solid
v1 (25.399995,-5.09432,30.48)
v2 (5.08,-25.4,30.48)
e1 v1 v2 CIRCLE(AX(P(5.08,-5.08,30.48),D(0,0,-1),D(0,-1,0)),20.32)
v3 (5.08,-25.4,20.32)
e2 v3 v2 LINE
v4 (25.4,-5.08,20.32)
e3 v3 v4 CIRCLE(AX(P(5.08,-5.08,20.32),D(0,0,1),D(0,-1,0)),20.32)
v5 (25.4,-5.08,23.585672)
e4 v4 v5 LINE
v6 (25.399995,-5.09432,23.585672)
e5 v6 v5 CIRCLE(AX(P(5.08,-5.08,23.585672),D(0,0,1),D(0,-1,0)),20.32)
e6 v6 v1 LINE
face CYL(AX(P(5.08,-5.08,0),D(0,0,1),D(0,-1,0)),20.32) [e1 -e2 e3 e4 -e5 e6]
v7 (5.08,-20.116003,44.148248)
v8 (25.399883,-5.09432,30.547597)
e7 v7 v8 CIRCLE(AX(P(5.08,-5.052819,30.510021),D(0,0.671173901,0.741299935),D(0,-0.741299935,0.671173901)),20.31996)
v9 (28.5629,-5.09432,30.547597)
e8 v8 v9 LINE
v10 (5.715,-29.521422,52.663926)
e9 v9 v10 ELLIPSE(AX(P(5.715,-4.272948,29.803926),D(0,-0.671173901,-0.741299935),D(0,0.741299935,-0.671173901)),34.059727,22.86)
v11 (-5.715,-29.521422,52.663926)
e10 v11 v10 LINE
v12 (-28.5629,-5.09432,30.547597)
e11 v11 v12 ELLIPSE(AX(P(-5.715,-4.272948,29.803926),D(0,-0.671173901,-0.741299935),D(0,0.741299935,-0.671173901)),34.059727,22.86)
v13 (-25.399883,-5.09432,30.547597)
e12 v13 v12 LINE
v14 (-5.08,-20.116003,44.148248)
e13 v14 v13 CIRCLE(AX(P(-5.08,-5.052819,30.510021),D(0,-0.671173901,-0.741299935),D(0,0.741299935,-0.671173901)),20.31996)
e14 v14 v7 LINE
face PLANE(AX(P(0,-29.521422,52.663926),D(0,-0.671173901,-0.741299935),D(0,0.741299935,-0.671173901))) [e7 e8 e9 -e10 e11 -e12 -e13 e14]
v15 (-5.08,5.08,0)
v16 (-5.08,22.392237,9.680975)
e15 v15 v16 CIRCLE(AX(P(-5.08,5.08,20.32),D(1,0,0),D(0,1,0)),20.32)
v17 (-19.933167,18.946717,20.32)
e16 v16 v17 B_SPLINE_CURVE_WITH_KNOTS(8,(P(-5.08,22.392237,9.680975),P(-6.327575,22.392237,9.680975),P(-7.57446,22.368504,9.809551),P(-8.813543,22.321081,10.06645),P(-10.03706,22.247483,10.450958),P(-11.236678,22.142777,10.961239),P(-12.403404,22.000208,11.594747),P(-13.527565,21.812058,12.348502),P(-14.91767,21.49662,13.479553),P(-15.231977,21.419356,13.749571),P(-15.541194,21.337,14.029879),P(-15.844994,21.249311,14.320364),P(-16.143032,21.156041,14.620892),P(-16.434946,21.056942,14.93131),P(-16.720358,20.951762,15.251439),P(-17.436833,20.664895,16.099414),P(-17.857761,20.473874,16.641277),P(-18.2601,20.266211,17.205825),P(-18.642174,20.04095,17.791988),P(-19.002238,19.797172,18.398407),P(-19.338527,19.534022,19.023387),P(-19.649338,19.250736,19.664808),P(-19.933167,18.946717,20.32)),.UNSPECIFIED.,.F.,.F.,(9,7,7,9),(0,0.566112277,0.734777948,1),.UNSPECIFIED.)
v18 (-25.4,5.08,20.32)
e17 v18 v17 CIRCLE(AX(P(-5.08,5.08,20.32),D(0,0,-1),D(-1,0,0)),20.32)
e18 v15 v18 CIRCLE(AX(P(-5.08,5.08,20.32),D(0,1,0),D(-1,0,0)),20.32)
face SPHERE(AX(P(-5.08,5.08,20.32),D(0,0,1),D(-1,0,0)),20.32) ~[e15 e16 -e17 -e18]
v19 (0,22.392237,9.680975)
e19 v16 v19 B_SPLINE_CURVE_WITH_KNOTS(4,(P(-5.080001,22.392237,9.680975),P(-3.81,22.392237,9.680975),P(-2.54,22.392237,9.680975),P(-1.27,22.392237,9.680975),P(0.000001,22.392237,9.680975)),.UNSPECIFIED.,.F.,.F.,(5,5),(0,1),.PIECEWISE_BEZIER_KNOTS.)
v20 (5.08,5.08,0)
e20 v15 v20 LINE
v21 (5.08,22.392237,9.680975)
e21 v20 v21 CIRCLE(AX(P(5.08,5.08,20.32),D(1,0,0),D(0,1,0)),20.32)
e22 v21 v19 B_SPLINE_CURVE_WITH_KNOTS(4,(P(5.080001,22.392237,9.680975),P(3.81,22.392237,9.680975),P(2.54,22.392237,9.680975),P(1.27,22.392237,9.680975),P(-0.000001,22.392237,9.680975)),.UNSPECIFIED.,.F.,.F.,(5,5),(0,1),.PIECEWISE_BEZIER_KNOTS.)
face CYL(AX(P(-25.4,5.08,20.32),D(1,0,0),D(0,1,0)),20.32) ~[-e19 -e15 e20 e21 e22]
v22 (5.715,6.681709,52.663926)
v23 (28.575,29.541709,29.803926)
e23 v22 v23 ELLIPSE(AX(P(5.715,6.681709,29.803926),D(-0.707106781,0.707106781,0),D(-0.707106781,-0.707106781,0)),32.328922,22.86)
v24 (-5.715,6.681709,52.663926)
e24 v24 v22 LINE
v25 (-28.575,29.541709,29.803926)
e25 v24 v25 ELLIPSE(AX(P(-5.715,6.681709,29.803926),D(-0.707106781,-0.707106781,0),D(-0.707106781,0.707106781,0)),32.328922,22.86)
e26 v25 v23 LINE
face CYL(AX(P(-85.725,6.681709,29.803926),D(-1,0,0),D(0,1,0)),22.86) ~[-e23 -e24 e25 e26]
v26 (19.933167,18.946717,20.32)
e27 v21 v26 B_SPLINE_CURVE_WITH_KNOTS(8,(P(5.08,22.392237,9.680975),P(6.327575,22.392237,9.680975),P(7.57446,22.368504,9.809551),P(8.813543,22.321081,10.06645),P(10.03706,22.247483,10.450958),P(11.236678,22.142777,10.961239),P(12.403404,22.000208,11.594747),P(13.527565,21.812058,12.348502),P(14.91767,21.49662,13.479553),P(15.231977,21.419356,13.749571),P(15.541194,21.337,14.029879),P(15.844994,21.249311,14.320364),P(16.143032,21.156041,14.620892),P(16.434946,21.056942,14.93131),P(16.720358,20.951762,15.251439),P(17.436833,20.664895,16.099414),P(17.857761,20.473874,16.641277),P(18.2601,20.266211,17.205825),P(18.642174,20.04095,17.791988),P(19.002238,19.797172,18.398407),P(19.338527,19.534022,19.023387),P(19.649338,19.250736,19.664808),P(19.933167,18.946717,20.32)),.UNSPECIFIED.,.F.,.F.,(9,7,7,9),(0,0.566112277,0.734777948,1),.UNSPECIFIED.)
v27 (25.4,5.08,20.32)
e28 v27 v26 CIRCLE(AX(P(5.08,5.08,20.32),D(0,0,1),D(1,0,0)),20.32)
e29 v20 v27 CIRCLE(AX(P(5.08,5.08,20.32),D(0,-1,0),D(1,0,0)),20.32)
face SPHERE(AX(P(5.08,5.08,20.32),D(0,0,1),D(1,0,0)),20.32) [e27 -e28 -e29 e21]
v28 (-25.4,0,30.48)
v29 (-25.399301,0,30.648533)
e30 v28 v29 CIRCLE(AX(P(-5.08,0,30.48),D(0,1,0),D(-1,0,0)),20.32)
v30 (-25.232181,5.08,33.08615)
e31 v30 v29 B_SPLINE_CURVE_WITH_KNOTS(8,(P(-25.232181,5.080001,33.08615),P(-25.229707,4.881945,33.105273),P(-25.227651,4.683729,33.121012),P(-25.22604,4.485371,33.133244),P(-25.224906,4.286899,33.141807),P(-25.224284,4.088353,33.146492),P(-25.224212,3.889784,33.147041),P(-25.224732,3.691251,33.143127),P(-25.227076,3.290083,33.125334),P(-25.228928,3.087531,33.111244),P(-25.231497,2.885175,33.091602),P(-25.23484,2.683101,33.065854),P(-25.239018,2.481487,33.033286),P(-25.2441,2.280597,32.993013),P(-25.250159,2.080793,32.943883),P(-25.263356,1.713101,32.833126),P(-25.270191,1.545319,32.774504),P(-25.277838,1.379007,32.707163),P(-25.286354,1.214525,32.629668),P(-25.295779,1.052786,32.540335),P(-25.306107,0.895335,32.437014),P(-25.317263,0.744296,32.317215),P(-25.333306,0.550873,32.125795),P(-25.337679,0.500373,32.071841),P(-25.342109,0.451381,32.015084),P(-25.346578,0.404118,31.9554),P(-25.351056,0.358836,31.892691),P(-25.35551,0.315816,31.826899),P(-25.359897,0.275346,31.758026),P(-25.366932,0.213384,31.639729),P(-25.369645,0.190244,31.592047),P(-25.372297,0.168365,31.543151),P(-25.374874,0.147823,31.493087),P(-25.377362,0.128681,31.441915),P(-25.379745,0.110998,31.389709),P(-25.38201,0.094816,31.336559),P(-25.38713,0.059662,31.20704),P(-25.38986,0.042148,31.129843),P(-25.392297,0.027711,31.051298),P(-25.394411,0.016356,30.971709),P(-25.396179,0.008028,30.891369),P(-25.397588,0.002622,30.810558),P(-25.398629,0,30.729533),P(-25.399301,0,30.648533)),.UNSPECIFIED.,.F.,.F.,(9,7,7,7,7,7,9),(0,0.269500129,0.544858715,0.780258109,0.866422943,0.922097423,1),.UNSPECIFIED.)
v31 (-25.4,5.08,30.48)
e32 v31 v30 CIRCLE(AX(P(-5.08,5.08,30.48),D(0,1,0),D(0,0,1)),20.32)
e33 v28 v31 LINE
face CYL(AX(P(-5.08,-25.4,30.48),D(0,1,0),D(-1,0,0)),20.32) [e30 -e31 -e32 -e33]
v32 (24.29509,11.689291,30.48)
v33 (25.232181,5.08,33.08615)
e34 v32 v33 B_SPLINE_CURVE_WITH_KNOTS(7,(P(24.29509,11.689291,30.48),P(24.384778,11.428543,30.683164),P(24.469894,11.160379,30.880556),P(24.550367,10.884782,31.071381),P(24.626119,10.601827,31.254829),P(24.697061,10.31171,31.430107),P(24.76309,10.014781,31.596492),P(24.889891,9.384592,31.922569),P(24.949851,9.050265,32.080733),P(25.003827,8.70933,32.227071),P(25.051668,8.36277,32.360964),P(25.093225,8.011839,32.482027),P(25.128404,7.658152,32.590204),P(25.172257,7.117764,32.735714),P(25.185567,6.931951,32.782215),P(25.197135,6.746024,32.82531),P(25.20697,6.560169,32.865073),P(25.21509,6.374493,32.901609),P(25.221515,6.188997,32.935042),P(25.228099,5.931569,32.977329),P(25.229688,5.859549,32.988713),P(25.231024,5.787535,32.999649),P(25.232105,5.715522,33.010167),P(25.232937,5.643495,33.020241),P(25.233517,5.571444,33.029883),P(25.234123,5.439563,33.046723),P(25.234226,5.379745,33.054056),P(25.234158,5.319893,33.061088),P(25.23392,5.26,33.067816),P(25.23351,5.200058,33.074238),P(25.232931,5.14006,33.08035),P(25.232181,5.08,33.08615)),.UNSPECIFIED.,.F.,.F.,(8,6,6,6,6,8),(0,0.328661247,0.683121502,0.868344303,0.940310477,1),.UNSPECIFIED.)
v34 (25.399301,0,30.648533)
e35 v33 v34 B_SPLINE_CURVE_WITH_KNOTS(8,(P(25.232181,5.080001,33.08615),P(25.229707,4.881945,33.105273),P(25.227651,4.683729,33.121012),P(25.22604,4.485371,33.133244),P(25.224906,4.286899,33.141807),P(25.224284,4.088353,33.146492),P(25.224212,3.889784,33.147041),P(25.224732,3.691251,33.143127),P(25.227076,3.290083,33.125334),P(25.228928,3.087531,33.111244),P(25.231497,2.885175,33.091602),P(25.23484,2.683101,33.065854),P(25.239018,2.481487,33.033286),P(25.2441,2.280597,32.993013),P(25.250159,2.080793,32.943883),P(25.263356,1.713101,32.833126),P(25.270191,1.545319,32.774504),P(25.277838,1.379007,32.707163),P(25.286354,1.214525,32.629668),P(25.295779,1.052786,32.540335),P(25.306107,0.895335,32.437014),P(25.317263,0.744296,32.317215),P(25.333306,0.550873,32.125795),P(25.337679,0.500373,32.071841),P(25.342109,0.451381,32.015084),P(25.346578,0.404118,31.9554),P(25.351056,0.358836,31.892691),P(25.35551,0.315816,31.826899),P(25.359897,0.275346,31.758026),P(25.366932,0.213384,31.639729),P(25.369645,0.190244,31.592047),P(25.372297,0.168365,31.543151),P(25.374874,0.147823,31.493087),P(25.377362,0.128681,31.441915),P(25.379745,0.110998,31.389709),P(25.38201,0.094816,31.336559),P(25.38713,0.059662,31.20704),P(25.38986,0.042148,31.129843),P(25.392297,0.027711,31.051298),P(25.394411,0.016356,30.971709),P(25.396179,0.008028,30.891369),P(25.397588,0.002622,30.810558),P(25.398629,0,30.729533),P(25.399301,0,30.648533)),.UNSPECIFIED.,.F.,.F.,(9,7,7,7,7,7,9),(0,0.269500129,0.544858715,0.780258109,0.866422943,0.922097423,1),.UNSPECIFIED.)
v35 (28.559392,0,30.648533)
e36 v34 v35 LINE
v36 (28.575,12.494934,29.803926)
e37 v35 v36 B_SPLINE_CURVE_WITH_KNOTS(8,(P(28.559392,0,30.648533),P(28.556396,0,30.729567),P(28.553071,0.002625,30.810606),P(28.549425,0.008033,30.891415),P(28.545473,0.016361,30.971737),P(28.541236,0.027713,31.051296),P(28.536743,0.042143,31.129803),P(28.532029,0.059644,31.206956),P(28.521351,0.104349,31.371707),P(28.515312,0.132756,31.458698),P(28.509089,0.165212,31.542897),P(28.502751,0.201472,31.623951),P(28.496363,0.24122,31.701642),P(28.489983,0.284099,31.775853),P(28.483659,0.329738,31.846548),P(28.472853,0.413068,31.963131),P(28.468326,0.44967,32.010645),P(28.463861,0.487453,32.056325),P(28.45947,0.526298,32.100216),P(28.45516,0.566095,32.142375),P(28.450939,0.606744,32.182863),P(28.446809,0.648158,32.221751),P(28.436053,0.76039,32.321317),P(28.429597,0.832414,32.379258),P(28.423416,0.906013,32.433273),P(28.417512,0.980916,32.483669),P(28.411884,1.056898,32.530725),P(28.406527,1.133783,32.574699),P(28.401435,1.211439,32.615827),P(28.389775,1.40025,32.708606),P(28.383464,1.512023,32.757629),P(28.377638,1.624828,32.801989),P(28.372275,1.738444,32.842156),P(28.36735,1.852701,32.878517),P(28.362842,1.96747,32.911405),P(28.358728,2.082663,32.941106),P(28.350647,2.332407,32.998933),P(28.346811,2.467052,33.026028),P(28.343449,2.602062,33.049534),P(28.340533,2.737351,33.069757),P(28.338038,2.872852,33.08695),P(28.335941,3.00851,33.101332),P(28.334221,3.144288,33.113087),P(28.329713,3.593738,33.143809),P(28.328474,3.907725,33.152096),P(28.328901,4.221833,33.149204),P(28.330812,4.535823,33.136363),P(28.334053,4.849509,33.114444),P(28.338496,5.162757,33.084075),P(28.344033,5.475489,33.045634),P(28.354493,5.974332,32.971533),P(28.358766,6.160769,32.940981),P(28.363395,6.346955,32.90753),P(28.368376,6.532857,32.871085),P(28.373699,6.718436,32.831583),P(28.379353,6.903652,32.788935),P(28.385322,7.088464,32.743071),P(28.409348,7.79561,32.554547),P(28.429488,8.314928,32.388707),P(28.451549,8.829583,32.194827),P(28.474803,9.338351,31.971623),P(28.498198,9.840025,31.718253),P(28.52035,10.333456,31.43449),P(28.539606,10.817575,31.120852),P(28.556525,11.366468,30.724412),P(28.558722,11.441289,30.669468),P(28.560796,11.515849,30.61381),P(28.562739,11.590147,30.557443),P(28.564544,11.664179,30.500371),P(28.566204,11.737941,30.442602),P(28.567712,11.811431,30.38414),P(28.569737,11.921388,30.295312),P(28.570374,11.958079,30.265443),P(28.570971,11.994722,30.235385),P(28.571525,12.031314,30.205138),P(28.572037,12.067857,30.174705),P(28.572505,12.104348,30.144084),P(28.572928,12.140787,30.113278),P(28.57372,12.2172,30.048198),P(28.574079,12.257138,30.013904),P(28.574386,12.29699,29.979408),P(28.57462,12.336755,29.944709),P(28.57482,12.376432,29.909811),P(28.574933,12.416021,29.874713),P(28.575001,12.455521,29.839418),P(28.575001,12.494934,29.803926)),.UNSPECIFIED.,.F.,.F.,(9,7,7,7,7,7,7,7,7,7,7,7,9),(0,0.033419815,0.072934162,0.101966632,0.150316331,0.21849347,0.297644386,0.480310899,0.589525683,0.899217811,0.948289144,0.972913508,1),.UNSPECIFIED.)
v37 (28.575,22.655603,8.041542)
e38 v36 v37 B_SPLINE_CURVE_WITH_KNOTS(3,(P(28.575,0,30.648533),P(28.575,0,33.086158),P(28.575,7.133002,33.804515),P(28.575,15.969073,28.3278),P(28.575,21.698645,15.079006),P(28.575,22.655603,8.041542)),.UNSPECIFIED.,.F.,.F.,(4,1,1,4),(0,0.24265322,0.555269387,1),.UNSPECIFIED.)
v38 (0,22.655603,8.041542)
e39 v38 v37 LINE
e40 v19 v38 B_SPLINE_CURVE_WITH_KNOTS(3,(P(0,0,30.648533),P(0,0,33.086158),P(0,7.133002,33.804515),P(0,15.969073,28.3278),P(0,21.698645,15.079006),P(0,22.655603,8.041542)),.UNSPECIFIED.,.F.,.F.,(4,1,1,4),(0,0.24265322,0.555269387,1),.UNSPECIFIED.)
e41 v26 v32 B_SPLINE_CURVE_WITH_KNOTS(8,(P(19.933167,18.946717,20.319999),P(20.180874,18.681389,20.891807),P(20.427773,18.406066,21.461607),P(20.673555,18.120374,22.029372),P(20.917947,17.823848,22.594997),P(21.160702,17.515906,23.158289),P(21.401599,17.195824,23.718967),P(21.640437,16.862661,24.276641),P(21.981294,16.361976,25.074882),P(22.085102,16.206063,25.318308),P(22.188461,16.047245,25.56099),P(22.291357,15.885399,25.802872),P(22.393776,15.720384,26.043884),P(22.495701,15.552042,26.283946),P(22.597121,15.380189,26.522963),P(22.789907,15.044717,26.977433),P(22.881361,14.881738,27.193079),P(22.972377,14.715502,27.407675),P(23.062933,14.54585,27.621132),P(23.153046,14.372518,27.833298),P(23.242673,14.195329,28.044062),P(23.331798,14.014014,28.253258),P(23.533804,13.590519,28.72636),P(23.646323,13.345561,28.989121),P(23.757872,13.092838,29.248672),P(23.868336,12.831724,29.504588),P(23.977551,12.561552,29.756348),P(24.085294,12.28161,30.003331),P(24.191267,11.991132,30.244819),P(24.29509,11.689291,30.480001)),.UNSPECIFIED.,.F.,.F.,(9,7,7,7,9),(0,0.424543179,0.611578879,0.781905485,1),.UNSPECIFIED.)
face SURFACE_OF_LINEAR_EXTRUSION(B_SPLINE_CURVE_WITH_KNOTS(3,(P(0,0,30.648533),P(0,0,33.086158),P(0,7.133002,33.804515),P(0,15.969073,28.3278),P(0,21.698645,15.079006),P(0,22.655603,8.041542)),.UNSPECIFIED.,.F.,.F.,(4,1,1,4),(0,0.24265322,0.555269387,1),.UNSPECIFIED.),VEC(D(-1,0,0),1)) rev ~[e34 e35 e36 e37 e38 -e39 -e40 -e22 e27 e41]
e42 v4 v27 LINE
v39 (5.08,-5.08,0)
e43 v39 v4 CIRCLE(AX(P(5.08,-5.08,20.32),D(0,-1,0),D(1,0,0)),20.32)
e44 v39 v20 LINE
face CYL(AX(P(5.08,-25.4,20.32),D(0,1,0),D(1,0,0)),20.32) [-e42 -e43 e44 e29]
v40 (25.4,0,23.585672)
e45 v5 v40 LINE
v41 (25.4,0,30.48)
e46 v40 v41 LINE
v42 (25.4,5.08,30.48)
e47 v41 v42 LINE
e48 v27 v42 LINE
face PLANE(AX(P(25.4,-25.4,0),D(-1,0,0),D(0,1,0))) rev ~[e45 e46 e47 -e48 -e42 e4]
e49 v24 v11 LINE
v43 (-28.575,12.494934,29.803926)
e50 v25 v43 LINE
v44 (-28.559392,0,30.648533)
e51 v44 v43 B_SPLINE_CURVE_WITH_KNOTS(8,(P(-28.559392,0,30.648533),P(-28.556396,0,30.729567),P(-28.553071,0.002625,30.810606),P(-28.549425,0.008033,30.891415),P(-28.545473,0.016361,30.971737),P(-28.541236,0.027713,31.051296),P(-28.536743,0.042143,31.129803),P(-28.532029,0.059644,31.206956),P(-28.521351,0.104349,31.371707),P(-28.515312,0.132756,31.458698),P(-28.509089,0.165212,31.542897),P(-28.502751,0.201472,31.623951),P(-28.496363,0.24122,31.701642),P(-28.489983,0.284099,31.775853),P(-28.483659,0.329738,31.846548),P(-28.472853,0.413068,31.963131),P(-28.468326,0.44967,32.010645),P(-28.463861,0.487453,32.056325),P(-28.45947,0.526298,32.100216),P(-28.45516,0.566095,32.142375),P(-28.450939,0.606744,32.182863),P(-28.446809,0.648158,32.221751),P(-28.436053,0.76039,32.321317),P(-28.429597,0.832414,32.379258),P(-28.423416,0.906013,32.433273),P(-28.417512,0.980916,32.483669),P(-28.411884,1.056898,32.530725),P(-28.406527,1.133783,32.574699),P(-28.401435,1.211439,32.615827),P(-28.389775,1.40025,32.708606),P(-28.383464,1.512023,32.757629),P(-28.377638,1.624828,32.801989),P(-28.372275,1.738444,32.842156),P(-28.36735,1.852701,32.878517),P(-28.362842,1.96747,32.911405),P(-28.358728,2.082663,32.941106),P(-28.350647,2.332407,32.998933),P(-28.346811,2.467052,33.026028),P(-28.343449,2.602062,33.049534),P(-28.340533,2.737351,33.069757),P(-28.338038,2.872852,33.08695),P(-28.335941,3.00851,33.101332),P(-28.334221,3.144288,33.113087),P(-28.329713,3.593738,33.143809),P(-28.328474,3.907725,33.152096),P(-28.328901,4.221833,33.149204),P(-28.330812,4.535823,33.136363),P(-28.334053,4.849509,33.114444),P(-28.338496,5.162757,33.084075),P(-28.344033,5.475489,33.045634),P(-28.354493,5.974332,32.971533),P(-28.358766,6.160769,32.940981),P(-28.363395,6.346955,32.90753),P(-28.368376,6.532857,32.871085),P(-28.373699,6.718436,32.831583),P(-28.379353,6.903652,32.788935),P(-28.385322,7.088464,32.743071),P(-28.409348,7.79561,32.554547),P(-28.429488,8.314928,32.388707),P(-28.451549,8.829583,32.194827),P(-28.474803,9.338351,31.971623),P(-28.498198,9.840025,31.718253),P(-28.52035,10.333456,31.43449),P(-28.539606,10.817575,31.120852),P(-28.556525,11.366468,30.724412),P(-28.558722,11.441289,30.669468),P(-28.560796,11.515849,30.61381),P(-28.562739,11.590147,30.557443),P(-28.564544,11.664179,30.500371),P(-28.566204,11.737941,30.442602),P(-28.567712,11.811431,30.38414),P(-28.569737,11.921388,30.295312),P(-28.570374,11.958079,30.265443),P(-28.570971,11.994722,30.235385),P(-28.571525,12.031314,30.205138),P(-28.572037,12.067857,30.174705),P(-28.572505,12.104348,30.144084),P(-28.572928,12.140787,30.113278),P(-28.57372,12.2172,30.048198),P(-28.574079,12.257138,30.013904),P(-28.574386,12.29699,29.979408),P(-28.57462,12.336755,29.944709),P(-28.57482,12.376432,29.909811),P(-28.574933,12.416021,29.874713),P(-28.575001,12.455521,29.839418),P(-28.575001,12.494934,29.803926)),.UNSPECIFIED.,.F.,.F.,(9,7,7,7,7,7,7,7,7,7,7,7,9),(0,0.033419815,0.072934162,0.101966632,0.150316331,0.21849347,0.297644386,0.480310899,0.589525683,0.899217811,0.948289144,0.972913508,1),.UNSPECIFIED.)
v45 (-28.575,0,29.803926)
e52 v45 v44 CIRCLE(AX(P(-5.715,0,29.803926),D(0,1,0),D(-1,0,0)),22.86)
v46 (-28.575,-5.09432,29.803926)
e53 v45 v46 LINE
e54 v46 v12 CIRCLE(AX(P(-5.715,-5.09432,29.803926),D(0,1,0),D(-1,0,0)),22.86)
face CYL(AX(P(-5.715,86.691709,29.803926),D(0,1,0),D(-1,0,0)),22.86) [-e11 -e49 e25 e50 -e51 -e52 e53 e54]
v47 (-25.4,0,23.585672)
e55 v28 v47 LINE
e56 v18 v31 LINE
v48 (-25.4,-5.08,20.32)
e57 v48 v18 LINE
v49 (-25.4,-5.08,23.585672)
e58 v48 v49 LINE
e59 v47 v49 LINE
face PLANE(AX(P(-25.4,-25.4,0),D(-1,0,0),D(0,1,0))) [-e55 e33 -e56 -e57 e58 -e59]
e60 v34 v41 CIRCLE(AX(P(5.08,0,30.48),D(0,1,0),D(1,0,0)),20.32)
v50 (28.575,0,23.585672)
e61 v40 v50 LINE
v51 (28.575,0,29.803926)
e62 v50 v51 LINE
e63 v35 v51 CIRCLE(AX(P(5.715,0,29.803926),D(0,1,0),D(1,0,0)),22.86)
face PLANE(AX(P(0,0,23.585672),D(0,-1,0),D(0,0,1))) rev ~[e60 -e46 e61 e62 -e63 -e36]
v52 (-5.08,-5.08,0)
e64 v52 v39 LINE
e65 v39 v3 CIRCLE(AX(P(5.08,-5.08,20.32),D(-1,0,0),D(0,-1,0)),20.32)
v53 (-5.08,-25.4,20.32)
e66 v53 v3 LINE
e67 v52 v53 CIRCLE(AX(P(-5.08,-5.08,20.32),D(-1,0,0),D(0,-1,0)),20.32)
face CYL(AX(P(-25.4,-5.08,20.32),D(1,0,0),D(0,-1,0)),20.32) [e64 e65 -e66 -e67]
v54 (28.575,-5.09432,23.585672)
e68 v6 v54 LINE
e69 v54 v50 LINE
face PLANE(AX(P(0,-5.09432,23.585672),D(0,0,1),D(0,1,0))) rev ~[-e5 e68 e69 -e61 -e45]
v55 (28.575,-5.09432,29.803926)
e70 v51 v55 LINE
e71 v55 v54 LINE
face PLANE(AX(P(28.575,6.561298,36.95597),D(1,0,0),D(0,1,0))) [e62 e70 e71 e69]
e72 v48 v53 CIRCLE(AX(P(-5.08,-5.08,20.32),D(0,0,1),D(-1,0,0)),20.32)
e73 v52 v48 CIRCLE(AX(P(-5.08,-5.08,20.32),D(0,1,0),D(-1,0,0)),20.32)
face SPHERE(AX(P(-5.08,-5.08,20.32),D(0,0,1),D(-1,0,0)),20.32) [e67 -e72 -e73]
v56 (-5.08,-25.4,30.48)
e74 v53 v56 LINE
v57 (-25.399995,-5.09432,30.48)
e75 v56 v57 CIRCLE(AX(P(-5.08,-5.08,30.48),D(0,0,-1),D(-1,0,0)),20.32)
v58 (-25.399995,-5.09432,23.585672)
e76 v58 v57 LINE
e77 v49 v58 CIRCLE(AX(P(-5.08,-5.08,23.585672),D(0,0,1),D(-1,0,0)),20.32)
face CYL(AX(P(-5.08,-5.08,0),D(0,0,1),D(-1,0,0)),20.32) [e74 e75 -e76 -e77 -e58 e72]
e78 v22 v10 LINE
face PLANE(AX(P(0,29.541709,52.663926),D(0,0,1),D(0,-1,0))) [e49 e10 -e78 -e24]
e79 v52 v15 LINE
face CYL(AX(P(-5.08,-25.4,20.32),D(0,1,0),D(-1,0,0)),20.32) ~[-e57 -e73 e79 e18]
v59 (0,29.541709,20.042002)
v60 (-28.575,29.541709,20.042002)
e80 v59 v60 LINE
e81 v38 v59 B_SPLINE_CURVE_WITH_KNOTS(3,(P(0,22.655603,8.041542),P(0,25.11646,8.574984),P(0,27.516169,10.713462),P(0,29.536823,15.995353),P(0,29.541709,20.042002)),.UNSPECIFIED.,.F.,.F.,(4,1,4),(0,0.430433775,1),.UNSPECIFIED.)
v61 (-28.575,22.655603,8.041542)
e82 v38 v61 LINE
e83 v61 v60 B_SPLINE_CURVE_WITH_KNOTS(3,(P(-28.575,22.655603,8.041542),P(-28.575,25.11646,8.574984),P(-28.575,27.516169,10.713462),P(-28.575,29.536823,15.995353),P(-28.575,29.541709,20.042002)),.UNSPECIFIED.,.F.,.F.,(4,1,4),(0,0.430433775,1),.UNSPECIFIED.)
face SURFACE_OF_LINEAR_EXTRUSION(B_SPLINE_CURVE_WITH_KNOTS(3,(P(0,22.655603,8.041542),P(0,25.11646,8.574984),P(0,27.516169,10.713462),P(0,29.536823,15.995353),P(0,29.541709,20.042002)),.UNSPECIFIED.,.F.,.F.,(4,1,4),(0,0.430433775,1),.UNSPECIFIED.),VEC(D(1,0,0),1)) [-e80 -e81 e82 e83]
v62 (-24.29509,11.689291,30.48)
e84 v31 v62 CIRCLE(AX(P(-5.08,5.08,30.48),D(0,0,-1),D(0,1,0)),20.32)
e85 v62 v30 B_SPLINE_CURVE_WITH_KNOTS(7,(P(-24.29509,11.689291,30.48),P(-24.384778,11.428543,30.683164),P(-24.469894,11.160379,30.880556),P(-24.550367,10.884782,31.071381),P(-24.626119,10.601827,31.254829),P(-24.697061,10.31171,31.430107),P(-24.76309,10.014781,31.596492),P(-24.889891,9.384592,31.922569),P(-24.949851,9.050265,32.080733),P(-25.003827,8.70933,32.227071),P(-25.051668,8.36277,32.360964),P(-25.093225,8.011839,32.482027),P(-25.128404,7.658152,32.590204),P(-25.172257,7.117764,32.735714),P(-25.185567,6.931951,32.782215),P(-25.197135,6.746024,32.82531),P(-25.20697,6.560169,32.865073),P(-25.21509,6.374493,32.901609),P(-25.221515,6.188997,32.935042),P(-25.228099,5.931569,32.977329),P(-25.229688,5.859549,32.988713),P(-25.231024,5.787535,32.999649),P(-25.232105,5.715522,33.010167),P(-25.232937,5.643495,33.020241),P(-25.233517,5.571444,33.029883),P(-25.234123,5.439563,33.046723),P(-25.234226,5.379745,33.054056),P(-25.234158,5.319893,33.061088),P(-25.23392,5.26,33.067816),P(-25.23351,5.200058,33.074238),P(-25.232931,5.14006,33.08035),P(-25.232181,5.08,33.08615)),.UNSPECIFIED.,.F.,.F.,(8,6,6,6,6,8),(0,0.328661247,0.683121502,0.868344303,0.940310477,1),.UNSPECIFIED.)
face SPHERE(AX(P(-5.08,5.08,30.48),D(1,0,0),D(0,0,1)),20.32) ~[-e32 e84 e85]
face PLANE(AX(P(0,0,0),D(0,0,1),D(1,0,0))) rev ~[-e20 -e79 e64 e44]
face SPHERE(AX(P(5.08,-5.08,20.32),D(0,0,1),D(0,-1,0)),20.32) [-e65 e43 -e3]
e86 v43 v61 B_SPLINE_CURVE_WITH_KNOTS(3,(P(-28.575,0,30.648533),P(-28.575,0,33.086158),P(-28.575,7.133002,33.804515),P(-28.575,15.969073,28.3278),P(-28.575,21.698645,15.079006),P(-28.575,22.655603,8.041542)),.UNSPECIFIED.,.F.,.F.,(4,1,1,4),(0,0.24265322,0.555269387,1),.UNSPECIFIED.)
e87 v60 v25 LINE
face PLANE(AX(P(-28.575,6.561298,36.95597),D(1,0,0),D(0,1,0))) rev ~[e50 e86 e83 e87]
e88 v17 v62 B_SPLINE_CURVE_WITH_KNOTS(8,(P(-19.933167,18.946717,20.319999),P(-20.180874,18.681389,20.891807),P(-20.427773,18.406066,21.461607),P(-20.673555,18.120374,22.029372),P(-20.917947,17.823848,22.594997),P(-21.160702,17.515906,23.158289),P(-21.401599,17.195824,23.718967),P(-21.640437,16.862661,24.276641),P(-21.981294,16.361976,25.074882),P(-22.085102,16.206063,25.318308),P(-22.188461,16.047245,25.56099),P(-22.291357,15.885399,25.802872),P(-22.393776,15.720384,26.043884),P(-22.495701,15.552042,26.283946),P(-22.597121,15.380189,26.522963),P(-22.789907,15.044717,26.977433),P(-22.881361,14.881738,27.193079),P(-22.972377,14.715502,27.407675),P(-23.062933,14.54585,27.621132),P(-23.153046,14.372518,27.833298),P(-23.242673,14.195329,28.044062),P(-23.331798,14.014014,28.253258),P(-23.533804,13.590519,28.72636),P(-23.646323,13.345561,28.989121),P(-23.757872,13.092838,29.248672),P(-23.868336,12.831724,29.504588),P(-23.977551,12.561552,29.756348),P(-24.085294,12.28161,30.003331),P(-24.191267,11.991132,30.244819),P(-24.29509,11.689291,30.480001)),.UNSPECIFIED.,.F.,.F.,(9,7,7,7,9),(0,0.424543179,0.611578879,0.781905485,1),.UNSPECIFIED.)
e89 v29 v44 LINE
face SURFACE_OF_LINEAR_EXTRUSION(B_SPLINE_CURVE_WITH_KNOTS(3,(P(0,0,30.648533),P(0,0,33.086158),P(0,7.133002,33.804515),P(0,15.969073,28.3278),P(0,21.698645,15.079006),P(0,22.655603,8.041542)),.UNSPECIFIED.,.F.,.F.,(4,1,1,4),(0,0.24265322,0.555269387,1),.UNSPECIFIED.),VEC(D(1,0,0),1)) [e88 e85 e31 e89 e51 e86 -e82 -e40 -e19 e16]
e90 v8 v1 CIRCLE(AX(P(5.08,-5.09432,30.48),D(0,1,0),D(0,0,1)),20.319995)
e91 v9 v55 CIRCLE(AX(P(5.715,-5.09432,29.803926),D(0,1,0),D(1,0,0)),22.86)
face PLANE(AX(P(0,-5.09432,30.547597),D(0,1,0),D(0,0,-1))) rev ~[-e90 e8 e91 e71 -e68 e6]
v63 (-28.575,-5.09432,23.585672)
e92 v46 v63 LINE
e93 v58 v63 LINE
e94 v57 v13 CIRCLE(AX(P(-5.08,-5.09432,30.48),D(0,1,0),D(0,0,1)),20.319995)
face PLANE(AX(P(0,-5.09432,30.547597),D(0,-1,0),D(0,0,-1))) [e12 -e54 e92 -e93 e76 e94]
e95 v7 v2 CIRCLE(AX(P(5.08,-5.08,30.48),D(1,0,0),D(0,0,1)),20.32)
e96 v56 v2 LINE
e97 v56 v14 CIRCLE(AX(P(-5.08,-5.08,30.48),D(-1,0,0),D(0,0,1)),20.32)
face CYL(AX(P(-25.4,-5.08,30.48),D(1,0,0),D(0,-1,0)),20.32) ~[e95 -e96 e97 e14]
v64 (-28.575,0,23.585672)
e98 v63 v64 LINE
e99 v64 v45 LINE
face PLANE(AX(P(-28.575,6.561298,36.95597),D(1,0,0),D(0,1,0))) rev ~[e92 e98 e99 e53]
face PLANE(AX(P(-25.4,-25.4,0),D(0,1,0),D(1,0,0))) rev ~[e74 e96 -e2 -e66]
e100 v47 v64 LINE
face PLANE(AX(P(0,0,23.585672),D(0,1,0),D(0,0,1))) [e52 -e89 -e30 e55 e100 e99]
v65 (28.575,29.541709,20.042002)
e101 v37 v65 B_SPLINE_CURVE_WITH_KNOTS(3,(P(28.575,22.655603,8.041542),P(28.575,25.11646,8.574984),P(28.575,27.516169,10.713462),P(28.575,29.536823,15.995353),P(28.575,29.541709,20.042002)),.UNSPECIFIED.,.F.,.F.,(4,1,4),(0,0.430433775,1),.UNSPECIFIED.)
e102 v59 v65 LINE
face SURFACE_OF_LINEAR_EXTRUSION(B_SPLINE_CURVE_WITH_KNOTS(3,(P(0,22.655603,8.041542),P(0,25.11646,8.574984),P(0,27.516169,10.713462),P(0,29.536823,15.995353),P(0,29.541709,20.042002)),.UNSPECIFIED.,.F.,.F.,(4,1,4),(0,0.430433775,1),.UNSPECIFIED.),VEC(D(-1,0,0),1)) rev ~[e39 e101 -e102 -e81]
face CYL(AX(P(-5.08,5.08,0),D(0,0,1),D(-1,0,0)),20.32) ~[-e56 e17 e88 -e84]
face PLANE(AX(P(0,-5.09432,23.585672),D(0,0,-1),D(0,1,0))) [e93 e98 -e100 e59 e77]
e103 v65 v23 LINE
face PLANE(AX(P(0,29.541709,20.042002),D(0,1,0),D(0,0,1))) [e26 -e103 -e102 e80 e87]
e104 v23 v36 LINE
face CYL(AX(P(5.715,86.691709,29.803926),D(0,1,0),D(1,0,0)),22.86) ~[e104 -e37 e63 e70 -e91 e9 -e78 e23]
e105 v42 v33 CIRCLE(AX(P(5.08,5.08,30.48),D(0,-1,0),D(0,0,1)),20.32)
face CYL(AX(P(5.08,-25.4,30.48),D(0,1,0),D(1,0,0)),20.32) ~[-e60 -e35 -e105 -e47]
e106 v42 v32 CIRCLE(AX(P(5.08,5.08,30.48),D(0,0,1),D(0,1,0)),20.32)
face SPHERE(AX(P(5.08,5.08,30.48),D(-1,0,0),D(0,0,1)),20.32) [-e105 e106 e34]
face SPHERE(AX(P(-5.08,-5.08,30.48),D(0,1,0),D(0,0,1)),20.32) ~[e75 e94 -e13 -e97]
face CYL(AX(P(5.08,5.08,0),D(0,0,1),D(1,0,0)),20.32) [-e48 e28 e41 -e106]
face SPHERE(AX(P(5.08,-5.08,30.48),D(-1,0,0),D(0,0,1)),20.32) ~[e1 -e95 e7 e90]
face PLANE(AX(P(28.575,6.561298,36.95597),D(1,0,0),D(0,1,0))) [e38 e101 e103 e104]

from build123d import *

# Parameters (mm, degrees)
F0_W          = 50.8
F0_H          = 50.8
F1_DEPTH      = 50.8
F2_R          = 20.32
F4_DEPTH      = 28.575
F4_DEPTH_BACK = 28.575
F5_T1_DEPTH   = 171.45
F5_T3_DEPTH   = 173.3631305569


# Not quite as in the source:
# - a fillet or chamfer that OpenCascade refuses, or shapes differently, is made with other operations: its cross-section is extruded or revolved along the edge and cut away or added


with BuildPart() as f1:
    # F0 (on Top) → F1 (new body)
    with BuildSketch(Plane.XY):
        Rectangle(F0_W, F0_H)
    extrude(amount=F1_DEPTH)

    # F2
    f2_edges = [f1.edges().sort_by_distance(p)[0] for p in [
        (0, 25.4, 50.8),
        (-25.4, 0, 50.8),
        (0, -25.4, 50.8),
        (25.4, 0, 50.8),
        (-25.4, 25.4, 25.4),
        (-25.4, -25.4, 25.4),
        (-25.4, 0, 0),
        (25.4, -25.4, 25.4),
        (0, -25.4, 0),
        (25.4, 25.4, 25.4),
        (25.4, 0, 0),
        (0, 25.4, 0),
    ]]
    fillet(f2_edges, radius=F2_R)

    # F3 (on Right) → F4 (join, two sides)
    with BuildSketch(Plane.YZ) as f4_sk:
        with BuildLine():
            Line((0, 23.585671559), (0, 30.6485332549))
            add(Edge.make_bspline(
                [(0, 30.6485332549), (0, 33.0861583352), (7.1330016043, 33.8045146668), (15.9690734978, 28.3277997784), (21.6986452978, 15.0790064451), (22.6556025445, 8.0415420234)],
                knots=[0, 0, 0, 0, 0.2426532196, 0.5552693869, 1, 1, 1, 1], degree=3))
            add(Edge.make_bspline(
                [(22.6556025445, 8.0415420234), (25.1164599813, 8.5749836186), (27.5161694097, 10.7134623968), (29.5368228108, 15.9953534603), (29.541708529, 20.0420022011)],
                knots=[0, 0, 0, 0, 0.4304337748, 1, 1, 1, 1], degree=3))
            Line((29.541708529, 20.0420022011), (29.541708529, 52.6639260352))
            Line((29.541708529, 52.6639260352), (-29.5214220279, 52.6639260352))
            Line((-29.5214220279, 52.6639260352), (-5.094319582, 30.5475965142))
            Line((-5.094319582, 30.5475965142), (-5.094319582, 23.585671559))
            Line((-5.094319582, 23.585671559), (0, 23.585671559))
        make_face()
    extrude(amount=F4_DEPTH)
    extrude(f4_sk.sketch, amount=-F4_DEPTH_BACK)

    # F5: fillet of radius 22.86 on 3 edges, made by hand

    # F5_s2 → F5_t1 (cut)
    with BuildSketch(Plane.YZ.offset(-85.725)):
        with BuildLine():
            ThreePointArc((29.541708529, 29.8039260352), (22.8461695469, 45.9683870531), (6.681708529, 52.6639260352))
            Line((6.681708529, 52.6639260352), (29.541708529, 52.6639260352))
            Line((29.541708529, 52.6639260352), (29.541708529, 29.8039260352))
        make_face()
    extrude(amount=F5_T1_DEPTH, mode=Mode.SUBTRACT)

    # F5_s4 → F5_t3 (cut)
    with BuildSketch(Plane.XZ.offset(-86.691708529)):
        with BuildLine():
            ThreePointArc((-28.575, 29.8039260352), (-21.8794610179, 45.9683870531), (-5.715, 52.6639260352))
            Line((-5.715, 52.6639260352), (-28.575, 52.6639260352))
            Line((-28.575, 52.6639260352), (-28.575, 29.8039260352))
        make_face()
        with BuildLine():
            ThreePointArc((28.575, 29.8039260352), (21.8794610179, 45.9683870531), (5.715, 52.6639260352))
            Line((5.715, 52.6639260352), (28.575, 52.6639260352))
            Line((28.575, 52.6639260352), (28.575, 29.8039260352))
        make_face()
    extrude(amount=F5_T3_DEPTH, mode=Mode.SUBTRACT)


solid = f1.part
